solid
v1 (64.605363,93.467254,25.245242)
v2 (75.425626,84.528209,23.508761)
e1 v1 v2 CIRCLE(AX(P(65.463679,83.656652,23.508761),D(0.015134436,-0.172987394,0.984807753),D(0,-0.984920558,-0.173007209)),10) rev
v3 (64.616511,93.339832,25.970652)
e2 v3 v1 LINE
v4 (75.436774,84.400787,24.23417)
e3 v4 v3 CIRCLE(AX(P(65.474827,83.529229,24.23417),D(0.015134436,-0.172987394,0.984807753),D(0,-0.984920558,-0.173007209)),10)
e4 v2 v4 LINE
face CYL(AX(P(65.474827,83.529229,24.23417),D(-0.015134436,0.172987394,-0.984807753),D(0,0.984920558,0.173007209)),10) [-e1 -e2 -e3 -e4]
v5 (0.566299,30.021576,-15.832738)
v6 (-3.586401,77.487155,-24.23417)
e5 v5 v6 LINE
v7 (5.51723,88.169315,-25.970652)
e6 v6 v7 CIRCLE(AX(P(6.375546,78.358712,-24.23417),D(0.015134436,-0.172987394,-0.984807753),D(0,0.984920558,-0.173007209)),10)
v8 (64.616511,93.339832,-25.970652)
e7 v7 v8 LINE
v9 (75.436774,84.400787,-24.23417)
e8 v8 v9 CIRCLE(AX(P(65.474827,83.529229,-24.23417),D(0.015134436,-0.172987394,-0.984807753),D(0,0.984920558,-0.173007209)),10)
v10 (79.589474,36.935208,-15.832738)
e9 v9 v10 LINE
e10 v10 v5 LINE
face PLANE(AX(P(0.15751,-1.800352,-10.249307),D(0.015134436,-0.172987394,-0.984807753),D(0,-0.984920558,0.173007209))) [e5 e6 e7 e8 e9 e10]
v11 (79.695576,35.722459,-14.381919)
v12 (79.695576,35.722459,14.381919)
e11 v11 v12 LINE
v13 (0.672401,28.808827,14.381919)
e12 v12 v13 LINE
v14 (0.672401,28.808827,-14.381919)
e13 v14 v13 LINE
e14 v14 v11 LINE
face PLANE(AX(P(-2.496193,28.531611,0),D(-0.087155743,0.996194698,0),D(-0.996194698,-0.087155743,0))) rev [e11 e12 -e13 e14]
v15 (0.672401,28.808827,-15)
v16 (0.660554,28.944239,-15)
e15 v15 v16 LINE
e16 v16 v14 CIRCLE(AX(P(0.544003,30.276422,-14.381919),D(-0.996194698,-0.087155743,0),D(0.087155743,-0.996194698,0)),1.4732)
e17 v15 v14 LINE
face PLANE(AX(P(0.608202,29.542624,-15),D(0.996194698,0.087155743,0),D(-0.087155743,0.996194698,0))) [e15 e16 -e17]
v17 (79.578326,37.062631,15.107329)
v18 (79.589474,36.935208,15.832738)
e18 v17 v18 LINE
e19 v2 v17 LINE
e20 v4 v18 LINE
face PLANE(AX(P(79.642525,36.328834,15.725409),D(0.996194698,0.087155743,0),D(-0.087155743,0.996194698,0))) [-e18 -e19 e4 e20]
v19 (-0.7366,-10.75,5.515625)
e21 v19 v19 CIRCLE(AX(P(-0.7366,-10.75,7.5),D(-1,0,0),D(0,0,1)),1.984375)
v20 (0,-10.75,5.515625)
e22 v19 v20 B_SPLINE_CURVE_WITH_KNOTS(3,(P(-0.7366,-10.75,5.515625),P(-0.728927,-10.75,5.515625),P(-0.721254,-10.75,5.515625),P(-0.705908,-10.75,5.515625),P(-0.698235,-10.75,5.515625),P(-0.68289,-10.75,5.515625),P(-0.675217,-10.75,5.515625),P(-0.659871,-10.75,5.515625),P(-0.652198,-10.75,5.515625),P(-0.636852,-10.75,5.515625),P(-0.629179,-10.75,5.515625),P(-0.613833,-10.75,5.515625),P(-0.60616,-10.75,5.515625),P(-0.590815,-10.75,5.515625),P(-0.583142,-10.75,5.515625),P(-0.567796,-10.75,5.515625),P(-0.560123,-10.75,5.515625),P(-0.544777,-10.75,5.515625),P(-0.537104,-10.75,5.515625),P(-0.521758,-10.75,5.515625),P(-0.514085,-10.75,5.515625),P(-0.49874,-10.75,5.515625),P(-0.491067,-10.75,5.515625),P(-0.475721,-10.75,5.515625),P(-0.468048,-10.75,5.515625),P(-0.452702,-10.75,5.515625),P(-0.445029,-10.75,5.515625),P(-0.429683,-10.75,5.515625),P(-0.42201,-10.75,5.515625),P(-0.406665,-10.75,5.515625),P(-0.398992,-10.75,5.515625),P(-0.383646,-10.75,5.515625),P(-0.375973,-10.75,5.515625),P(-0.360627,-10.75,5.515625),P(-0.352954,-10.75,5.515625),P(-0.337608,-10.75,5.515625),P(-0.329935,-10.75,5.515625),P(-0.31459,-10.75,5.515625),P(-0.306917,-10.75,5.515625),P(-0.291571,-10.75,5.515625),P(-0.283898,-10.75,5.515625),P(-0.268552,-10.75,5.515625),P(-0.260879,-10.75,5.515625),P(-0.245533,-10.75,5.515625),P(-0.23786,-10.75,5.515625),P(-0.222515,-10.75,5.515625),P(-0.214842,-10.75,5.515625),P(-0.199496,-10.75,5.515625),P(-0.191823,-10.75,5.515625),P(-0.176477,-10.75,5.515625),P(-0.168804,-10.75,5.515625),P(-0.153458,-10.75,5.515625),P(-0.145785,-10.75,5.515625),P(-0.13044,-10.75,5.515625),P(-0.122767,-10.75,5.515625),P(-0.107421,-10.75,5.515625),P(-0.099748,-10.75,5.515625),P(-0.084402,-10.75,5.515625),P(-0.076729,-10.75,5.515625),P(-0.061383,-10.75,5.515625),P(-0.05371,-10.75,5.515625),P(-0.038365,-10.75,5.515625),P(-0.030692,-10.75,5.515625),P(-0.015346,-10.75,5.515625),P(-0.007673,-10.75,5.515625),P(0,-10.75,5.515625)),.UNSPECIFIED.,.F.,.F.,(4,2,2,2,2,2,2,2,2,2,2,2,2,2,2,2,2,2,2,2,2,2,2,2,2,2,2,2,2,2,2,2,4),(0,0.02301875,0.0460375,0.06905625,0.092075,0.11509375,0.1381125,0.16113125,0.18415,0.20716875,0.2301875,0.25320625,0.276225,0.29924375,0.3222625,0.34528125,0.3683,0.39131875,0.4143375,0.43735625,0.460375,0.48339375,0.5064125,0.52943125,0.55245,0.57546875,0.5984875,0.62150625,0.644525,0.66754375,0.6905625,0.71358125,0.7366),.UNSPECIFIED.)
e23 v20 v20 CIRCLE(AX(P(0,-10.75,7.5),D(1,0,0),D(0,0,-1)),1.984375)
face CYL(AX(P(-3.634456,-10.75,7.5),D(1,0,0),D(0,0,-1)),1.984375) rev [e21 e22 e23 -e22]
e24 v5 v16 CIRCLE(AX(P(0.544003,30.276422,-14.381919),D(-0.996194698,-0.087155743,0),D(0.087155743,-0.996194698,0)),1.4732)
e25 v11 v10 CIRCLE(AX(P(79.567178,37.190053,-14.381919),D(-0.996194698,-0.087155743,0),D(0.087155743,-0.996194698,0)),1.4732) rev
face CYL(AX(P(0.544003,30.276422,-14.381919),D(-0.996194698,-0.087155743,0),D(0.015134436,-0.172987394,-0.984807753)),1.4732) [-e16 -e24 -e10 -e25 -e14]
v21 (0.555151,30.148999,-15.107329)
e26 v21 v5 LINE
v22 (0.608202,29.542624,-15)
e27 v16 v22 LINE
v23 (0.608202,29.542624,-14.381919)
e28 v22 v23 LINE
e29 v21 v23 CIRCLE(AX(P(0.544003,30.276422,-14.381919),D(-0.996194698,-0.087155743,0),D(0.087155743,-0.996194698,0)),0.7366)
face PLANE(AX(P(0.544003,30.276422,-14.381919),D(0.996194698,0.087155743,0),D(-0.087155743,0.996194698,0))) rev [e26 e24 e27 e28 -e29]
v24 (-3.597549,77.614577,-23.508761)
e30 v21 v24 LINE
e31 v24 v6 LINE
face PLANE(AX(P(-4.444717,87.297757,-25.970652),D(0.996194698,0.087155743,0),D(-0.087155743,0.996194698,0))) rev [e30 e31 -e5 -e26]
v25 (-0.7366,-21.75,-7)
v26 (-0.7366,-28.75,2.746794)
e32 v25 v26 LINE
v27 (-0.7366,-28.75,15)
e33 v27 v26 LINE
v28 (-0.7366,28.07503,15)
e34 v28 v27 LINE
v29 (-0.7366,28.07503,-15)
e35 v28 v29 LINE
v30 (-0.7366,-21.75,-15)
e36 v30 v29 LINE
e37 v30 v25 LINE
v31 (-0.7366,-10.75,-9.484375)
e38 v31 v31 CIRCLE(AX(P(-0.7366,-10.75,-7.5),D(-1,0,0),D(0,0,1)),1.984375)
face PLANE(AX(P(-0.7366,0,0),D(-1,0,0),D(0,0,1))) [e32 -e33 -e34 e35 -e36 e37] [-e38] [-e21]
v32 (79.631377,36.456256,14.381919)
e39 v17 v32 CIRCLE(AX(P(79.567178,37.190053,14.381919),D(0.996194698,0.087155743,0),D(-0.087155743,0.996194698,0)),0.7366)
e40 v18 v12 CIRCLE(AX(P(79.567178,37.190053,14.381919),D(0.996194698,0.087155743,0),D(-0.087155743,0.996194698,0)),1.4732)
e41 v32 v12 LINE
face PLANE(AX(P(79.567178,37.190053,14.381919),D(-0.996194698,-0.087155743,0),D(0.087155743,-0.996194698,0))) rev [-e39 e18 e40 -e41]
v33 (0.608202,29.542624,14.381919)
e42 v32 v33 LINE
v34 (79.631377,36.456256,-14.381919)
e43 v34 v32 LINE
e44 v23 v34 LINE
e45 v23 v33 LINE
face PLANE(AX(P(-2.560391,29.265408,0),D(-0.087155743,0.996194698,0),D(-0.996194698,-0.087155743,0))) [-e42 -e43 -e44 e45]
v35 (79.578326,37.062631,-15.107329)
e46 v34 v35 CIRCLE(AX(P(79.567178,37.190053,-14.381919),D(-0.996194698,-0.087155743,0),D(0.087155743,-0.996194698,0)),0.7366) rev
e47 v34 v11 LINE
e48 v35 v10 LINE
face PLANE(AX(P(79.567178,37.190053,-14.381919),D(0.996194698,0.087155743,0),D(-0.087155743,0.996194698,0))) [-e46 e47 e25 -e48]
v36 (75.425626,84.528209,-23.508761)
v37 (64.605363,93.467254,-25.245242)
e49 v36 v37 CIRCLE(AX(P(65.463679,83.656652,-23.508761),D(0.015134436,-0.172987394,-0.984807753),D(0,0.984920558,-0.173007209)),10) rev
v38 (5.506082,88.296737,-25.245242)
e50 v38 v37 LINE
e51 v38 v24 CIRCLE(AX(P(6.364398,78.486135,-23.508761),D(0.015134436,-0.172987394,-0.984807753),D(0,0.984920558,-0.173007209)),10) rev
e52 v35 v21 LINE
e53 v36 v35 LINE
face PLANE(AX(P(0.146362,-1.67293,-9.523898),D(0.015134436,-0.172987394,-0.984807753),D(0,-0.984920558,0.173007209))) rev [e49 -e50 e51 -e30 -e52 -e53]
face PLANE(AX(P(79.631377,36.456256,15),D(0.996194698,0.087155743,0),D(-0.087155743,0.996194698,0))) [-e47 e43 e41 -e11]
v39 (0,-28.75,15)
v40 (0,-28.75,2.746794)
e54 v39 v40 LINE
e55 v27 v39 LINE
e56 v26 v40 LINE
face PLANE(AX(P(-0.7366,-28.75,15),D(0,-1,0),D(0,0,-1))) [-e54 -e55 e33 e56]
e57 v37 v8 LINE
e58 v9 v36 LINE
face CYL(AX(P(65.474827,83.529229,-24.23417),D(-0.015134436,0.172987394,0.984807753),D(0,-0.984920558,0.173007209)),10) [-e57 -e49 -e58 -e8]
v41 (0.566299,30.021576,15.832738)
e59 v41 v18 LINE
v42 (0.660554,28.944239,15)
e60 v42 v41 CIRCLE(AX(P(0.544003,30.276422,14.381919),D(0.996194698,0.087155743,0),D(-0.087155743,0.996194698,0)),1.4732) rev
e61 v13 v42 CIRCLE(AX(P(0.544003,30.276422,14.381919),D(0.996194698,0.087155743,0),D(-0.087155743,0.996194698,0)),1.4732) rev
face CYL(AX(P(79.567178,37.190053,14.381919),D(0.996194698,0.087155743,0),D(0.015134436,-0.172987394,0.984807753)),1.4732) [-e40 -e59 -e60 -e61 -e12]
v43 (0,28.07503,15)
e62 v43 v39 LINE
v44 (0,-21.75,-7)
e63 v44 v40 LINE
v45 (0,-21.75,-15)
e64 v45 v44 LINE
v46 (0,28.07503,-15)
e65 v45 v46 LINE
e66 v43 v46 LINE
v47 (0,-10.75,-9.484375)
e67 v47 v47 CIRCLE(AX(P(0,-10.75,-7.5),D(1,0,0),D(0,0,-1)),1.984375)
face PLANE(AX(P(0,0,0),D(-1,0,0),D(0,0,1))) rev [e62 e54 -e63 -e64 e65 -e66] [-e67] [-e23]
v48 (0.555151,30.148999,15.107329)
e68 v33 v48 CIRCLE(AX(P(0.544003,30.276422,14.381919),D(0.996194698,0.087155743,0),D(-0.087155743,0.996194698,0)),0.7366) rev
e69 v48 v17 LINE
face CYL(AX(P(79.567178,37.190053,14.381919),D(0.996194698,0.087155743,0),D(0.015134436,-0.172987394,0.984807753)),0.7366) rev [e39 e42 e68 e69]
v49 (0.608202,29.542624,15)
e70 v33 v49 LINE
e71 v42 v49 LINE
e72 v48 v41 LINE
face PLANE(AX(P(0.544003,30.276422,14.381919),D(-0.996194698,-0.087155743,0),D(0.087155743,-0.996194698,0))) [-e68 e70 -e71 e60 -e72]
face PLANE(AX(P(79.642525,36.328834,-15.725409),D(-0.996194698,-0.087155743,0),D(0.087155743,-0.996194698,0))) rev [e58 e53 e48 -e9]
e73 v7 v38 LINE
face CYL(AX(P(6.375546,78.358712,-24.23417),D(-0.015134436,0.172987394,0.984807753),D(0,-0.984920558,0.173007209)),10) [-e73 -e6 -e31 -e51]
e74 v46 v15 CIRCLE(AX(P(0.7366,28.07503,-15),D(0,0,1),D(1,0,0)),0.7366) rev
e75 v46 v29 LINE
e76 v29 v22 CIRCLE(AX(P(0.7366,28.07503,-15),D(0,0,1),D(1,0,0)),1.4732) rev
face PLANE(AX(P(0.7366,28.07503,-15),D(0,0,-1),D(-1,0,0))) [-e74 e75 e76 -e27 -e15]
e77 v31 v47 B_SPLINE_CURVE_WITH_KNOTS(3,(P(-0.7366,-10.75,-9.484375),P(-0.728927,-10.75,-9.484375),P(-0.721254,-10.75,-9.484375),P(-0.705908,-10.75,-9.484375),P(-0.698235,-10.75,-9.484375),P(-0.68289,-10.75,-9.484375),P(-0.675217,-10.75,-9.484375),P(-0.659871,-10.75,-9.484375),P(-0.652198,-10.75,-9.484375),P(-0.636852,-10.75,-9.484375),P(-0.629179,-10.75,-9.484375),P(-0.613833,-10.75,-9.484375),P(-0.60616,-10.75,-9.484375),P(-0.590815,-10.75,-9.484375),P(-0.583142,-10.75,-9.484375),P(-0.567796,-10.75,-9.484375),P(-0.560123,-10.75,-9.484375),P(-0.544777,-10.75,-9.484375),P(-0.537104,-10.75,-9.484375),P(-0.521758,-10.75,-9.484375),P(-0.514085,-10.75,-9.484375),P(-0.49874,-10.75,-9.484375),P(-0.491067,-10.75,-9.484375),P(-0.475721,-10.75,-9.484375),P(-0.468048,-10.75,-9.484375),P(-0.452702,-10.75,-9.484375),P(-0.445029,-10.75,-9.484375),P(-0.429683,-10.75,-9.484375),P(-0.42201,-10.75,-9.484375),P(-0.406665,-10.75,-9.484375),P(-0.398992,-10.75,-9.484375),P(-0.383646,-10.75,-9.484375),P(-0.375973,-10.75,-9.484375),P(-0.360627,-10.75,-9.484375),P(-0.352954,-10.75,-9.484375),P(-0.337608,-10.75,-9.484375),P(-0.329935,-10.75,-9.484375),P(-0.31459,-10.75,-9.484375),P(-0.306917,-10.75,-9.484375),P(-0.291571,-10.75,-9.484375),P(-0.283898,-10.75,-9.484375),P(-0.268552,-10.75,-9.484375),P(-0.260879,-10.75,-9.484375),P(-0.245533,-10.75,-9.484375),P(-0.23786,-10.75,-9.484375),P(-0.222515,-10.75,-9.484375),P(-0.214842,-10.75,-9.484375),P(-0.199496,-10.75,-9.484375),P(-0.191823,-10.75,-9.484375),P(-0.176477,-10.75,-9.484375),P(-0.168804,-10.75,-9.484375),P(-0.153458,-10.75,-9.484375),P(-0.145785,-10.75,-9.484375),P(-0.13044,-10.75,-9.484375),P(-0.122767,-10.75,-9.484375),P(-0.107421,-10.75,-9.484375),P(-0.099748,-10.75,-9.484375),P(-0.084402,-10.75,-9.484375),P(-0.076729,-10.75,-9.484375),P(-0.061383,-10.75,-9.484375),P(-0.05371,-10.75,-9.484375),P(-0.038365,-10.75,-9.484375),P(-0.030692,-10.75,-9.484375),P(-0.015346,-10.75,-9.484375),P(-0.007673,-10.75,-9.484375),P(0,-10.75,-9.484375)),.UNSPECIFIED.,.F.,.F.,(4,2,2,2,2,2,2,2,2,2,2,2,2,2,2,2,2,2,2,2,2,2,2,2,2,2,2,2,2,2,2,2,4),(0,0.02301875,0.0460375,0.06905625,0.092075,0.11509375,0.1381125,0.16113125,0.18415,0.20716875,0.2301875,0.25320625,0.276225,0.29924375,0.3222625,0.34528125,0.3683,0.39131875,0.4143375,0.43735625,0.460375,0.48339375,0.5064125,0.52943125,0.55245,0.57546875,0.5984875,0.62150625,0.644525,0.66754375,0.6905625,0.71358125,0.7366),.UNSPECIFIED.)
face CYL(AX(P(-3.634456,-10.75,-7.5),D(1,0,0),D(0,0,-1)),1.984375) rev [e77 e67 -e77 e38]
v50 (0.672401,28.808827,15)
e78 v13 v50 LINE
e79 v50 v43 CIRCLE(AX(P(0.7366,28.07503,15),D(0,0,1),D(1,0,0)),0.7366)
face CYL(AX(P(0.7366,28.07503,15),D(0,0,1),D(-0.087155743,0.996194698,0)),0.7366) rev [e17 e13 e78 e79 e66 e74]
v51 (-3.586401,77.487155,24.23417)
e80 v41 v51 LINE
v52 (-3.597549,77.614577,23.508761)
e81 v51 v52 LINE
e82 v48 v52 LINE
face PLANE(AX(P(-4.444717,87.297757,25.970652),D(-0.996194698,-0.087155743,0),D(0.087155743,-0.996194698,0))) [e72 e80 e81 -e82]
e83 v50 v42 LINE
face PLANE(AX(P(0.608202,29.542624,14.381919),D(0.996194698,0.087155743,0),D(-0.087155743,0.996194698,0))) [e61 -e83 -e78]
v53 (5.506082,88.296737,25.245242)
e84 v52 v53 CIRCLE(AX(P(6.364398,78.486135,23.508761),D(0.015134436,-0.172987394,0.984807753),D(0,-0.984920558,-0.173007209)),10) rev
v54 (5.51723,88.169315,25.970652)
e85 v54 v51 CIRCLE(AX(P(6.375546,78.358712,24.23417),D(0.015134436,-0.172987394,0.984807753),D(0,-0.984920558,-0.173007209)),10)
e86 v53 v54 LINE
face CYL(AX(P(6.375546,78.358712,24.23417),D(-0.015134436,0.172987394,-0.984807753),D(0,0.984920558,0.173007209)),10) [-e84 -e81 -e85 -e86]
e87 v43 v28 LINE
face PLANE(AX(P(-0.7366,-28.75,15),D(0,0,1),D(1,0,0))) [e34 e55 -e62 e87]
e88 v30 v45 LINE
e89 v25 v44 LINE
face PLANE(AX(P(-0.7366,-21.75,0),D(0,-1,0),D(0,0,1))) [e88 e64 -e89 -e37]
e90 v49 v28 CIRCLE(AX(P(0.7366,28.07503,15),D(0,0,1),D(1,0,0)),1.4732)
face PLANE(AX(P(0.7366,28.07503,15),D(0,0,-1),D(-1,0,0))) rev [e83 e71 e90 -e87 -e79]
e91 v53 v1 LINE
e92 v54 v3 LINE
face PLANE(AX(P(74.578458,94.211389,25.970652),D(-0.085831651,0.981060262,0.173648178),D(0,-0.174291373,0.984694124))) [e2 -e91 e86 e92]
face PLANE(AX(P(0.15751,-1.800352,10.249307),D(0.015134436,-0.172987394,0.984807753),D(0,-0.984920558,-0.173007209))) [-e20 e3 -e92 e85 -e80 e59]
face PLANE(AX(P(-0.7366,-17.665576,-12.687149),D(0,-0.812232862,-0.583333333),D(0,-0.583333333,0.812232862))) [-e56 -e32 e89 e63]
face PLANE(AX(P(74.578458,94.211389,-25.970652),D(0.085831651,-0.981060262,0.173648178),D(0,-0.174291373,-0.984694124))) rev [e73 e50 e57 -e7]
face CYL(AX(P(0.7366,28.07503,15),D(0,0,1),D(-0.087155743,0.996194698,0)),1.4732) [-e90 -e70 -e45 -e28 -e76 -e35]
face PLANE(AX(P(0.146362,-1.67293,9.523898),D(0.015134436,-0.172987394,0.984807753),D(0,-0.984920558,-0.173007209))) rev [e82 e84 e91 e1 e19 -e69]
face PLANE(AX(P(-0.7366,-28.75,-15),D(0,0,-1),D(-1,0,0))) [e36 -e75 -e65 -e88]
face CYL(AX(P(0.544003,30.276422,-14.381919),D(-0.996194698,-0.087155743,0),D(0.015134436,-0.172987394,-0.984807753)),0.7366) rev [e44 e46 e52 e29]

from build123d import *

# Parameters (mm, degrees)
SKETCH1_W                    = 30
SKETCH1_H                    = 57.5
BASE_FLANGE1_DEPTH           = 0.7366
EDGE_FLANGE1_STRIP_CUT_DEPTH = 30
EDGE_FLANGE1_DEPTH           = 30
EDGE_FLANGE2_STRIP_CUT_DEPTH = 79.325030457
EDGE_FLANGE2_DEPTH           = 79.325030457
FILLET1_R                    = 10
CUT_EXTRUDE1_DEPTH           = 126.57552091
CUT_EXTRUDE1_DEPTH_BACK      = 126.57552091
SKETCH14_R                   = 1.984375
CUT_EXTRUDE2_DEPTH           = 126.57552091


# Sheet-metal steps are written as plain solids
with BuildPart() as part:
    # Sketch1 → Base-Flange1 (new body)
    with BuildSketch(Plane(origin=(0, 0, 0), x_dir=(0, 0, -1), z_dir=(1, 0, 0))):
        Rectangle(SKETCH1_W, SKETCH1_H)
    extrude(amount=-BASE_FLANGE1_DEPTH)

    # Edge-Flange1 strip (across the edge) → Edge-Flange1 strip cut (cut)
    with BuildSketch(Plane(origin=(0, 28.75, -15), x_dir=(0.087155742747662, -0.9961946980917452, 0), z_dir=(0, 0, 1))):
        Polygon((-3.794579928, -0.407430966), (0.60820216, -0.792624486), (0.67240108, -0.058827472), (-3.730381008, 0.326366049), align=None)
    extrude(amount=EDGE_FLANGE1_STRIP_CUT_DEPTH, mode=Mode.SUBTRACT)

    # Edge-Flange1 section (across the edge) → Edge-Flange1 (add)
    with BuildSketch(Plane(origin=(0, 28.75, -15), x_dir=(0.087155742747662, -0.9961946980917452, 0), z_dir=(0, 0, 1))):
        with BuildLine():
            Line((-0.7366, 0.674969543), (-0.7366, 80))
            Line((-0.7366, 80), (0, 80))
            Line((0, 80), (0, 0.674969543))
            ThreePointArc((0, 0.674969543), (0.193521514, 0.177329796), (0.67240108, -0.058827472))
            Line((0.67240108, -0.058827472), (0.60820216, -0.792624486))
            ThreePointArc((0.60820216, -0.792624486), (-0.349556973, -0.320309951), (-0.7366, 0.674969543))
        make_face()
    extrude(amount=EDGE_FLANGE1_DEPTH)

    # Edge-Flange2 strip (across the edge) → Edge-Flange2 strip cut (cut)
    with BuildSketch(Plane(origin=(0.60820216, 29.542624486, 15), x_dir=(-0.015134435901339633, 0.17298739392509335, -0.9848077530122075), z_dir=(0.9961946980917453, 0.08715574274766204, 0))):
        Polygon((-3.871674841, -0.065282507), (0.480781505, -0.832737993), (0.608690752, -0.107328603), (-3.743765593, 0.660126883), align=None)
    edge_flange2_strip_cut = extrude(amount=EDGE_FLANGE2_STRIP_CUT_DEPTH, mode=Mode.SUBTRACT)

    # Edge-Flange2 section (across the edge) → Edge-Flange2 (add)
    with BuildSketch(Plane(origin=(0.60820216, 29.542624486, 15), x_dir=(-0.015134435901339633, 0.17298739392509335, -0.9848077530122075), z_dir=(0.9961946980917453, 0.08715574274766204, 0))):
        with BuildLine():
            Line((-0.7366, 0.618080788), (-0.7366, 59))
            Line((-0.7366, 59), (0, 59))
            Line((0, 59), (0, 0.618080788))
            ThreePointArc((0, 0.618080788), (0.172331663, 0.144603435), (0.608690752, -0.107328603))
            Line((0.608690752, -0.107328603), (0.480781505, -0.832737993))
            ThreePointArc((0.480781505, -0.832737993), (-0.391936674, -0.328873918), (-0.7366, 0.618080788))
        make_face()
    edge_flange2 = extrude(amount=EDGE_FLANGE2_DEPTH)

    # Mirror1: Edge-Flange2 strip cut, Edge-Flange2 across plane
    add(edge_flange2_strip_cut.mirror(Plane.XY), mode=Mode.SUBTRACT)
    add(edge_flange2.mirror(Plane.XY))

    # Fillet1
    fillet1_edges = [part.edges().sort_by_distance(p)[0] for p in [
        (74.572883521, 94.275100646, -25.607947178),
        (-4.450291247, 87.361468698, -25.607947178),
        (-4.450291247, 87.361468698, 25.607947178),
        (74.572883521, 94.275100646, 25.607947178),
    ]]
    fillet(fillet1_edges, radius=FILLET1_R)

    # Sketch13 → Cut-Extrude1 (cut, two sides: drawn at the far end of the back side and taken through both)
    with BuildSketch(Plane(origin=(0, 0, 0), x_dir=(0, 0, -1), z_dir=(1, 0, 0)).offset(-CUT_EXTRUDE1_DEPTH_BACK)):
        Polygon((276.166836222, -21.75), (15, -21.75), (7, -21.75), (-2.746794345, -28.75), (-214.875081206, -181.097321129), (-53.649855395, -677.926156777), (437.392062033, -518.578835647), align=None)
    extrude(amount=CUT_EXTRUDE1_DEPTH + CUT_EXTRUDE1_DEPTH_BACK, mode=Mode.SUBTRACT)

    # Sketch14 → Cut-Extrude2 (cut, through all)
    with BuildSketch(Plane(origin=(0, 0, 0), x_dir=(0, 0, -1), z_dir=(1, 0, 0))):
        with Locations((-7.5, -10.75)):
            Circle(SKETCH14_R)
        with Locations((7.5, -10.75)):
            Circle(SKETCH14_R)
    extrude(amount=-CUT_EXTRUDE2_DEPTH, mode=Mode.SUBTRACT)


solid = part.part
